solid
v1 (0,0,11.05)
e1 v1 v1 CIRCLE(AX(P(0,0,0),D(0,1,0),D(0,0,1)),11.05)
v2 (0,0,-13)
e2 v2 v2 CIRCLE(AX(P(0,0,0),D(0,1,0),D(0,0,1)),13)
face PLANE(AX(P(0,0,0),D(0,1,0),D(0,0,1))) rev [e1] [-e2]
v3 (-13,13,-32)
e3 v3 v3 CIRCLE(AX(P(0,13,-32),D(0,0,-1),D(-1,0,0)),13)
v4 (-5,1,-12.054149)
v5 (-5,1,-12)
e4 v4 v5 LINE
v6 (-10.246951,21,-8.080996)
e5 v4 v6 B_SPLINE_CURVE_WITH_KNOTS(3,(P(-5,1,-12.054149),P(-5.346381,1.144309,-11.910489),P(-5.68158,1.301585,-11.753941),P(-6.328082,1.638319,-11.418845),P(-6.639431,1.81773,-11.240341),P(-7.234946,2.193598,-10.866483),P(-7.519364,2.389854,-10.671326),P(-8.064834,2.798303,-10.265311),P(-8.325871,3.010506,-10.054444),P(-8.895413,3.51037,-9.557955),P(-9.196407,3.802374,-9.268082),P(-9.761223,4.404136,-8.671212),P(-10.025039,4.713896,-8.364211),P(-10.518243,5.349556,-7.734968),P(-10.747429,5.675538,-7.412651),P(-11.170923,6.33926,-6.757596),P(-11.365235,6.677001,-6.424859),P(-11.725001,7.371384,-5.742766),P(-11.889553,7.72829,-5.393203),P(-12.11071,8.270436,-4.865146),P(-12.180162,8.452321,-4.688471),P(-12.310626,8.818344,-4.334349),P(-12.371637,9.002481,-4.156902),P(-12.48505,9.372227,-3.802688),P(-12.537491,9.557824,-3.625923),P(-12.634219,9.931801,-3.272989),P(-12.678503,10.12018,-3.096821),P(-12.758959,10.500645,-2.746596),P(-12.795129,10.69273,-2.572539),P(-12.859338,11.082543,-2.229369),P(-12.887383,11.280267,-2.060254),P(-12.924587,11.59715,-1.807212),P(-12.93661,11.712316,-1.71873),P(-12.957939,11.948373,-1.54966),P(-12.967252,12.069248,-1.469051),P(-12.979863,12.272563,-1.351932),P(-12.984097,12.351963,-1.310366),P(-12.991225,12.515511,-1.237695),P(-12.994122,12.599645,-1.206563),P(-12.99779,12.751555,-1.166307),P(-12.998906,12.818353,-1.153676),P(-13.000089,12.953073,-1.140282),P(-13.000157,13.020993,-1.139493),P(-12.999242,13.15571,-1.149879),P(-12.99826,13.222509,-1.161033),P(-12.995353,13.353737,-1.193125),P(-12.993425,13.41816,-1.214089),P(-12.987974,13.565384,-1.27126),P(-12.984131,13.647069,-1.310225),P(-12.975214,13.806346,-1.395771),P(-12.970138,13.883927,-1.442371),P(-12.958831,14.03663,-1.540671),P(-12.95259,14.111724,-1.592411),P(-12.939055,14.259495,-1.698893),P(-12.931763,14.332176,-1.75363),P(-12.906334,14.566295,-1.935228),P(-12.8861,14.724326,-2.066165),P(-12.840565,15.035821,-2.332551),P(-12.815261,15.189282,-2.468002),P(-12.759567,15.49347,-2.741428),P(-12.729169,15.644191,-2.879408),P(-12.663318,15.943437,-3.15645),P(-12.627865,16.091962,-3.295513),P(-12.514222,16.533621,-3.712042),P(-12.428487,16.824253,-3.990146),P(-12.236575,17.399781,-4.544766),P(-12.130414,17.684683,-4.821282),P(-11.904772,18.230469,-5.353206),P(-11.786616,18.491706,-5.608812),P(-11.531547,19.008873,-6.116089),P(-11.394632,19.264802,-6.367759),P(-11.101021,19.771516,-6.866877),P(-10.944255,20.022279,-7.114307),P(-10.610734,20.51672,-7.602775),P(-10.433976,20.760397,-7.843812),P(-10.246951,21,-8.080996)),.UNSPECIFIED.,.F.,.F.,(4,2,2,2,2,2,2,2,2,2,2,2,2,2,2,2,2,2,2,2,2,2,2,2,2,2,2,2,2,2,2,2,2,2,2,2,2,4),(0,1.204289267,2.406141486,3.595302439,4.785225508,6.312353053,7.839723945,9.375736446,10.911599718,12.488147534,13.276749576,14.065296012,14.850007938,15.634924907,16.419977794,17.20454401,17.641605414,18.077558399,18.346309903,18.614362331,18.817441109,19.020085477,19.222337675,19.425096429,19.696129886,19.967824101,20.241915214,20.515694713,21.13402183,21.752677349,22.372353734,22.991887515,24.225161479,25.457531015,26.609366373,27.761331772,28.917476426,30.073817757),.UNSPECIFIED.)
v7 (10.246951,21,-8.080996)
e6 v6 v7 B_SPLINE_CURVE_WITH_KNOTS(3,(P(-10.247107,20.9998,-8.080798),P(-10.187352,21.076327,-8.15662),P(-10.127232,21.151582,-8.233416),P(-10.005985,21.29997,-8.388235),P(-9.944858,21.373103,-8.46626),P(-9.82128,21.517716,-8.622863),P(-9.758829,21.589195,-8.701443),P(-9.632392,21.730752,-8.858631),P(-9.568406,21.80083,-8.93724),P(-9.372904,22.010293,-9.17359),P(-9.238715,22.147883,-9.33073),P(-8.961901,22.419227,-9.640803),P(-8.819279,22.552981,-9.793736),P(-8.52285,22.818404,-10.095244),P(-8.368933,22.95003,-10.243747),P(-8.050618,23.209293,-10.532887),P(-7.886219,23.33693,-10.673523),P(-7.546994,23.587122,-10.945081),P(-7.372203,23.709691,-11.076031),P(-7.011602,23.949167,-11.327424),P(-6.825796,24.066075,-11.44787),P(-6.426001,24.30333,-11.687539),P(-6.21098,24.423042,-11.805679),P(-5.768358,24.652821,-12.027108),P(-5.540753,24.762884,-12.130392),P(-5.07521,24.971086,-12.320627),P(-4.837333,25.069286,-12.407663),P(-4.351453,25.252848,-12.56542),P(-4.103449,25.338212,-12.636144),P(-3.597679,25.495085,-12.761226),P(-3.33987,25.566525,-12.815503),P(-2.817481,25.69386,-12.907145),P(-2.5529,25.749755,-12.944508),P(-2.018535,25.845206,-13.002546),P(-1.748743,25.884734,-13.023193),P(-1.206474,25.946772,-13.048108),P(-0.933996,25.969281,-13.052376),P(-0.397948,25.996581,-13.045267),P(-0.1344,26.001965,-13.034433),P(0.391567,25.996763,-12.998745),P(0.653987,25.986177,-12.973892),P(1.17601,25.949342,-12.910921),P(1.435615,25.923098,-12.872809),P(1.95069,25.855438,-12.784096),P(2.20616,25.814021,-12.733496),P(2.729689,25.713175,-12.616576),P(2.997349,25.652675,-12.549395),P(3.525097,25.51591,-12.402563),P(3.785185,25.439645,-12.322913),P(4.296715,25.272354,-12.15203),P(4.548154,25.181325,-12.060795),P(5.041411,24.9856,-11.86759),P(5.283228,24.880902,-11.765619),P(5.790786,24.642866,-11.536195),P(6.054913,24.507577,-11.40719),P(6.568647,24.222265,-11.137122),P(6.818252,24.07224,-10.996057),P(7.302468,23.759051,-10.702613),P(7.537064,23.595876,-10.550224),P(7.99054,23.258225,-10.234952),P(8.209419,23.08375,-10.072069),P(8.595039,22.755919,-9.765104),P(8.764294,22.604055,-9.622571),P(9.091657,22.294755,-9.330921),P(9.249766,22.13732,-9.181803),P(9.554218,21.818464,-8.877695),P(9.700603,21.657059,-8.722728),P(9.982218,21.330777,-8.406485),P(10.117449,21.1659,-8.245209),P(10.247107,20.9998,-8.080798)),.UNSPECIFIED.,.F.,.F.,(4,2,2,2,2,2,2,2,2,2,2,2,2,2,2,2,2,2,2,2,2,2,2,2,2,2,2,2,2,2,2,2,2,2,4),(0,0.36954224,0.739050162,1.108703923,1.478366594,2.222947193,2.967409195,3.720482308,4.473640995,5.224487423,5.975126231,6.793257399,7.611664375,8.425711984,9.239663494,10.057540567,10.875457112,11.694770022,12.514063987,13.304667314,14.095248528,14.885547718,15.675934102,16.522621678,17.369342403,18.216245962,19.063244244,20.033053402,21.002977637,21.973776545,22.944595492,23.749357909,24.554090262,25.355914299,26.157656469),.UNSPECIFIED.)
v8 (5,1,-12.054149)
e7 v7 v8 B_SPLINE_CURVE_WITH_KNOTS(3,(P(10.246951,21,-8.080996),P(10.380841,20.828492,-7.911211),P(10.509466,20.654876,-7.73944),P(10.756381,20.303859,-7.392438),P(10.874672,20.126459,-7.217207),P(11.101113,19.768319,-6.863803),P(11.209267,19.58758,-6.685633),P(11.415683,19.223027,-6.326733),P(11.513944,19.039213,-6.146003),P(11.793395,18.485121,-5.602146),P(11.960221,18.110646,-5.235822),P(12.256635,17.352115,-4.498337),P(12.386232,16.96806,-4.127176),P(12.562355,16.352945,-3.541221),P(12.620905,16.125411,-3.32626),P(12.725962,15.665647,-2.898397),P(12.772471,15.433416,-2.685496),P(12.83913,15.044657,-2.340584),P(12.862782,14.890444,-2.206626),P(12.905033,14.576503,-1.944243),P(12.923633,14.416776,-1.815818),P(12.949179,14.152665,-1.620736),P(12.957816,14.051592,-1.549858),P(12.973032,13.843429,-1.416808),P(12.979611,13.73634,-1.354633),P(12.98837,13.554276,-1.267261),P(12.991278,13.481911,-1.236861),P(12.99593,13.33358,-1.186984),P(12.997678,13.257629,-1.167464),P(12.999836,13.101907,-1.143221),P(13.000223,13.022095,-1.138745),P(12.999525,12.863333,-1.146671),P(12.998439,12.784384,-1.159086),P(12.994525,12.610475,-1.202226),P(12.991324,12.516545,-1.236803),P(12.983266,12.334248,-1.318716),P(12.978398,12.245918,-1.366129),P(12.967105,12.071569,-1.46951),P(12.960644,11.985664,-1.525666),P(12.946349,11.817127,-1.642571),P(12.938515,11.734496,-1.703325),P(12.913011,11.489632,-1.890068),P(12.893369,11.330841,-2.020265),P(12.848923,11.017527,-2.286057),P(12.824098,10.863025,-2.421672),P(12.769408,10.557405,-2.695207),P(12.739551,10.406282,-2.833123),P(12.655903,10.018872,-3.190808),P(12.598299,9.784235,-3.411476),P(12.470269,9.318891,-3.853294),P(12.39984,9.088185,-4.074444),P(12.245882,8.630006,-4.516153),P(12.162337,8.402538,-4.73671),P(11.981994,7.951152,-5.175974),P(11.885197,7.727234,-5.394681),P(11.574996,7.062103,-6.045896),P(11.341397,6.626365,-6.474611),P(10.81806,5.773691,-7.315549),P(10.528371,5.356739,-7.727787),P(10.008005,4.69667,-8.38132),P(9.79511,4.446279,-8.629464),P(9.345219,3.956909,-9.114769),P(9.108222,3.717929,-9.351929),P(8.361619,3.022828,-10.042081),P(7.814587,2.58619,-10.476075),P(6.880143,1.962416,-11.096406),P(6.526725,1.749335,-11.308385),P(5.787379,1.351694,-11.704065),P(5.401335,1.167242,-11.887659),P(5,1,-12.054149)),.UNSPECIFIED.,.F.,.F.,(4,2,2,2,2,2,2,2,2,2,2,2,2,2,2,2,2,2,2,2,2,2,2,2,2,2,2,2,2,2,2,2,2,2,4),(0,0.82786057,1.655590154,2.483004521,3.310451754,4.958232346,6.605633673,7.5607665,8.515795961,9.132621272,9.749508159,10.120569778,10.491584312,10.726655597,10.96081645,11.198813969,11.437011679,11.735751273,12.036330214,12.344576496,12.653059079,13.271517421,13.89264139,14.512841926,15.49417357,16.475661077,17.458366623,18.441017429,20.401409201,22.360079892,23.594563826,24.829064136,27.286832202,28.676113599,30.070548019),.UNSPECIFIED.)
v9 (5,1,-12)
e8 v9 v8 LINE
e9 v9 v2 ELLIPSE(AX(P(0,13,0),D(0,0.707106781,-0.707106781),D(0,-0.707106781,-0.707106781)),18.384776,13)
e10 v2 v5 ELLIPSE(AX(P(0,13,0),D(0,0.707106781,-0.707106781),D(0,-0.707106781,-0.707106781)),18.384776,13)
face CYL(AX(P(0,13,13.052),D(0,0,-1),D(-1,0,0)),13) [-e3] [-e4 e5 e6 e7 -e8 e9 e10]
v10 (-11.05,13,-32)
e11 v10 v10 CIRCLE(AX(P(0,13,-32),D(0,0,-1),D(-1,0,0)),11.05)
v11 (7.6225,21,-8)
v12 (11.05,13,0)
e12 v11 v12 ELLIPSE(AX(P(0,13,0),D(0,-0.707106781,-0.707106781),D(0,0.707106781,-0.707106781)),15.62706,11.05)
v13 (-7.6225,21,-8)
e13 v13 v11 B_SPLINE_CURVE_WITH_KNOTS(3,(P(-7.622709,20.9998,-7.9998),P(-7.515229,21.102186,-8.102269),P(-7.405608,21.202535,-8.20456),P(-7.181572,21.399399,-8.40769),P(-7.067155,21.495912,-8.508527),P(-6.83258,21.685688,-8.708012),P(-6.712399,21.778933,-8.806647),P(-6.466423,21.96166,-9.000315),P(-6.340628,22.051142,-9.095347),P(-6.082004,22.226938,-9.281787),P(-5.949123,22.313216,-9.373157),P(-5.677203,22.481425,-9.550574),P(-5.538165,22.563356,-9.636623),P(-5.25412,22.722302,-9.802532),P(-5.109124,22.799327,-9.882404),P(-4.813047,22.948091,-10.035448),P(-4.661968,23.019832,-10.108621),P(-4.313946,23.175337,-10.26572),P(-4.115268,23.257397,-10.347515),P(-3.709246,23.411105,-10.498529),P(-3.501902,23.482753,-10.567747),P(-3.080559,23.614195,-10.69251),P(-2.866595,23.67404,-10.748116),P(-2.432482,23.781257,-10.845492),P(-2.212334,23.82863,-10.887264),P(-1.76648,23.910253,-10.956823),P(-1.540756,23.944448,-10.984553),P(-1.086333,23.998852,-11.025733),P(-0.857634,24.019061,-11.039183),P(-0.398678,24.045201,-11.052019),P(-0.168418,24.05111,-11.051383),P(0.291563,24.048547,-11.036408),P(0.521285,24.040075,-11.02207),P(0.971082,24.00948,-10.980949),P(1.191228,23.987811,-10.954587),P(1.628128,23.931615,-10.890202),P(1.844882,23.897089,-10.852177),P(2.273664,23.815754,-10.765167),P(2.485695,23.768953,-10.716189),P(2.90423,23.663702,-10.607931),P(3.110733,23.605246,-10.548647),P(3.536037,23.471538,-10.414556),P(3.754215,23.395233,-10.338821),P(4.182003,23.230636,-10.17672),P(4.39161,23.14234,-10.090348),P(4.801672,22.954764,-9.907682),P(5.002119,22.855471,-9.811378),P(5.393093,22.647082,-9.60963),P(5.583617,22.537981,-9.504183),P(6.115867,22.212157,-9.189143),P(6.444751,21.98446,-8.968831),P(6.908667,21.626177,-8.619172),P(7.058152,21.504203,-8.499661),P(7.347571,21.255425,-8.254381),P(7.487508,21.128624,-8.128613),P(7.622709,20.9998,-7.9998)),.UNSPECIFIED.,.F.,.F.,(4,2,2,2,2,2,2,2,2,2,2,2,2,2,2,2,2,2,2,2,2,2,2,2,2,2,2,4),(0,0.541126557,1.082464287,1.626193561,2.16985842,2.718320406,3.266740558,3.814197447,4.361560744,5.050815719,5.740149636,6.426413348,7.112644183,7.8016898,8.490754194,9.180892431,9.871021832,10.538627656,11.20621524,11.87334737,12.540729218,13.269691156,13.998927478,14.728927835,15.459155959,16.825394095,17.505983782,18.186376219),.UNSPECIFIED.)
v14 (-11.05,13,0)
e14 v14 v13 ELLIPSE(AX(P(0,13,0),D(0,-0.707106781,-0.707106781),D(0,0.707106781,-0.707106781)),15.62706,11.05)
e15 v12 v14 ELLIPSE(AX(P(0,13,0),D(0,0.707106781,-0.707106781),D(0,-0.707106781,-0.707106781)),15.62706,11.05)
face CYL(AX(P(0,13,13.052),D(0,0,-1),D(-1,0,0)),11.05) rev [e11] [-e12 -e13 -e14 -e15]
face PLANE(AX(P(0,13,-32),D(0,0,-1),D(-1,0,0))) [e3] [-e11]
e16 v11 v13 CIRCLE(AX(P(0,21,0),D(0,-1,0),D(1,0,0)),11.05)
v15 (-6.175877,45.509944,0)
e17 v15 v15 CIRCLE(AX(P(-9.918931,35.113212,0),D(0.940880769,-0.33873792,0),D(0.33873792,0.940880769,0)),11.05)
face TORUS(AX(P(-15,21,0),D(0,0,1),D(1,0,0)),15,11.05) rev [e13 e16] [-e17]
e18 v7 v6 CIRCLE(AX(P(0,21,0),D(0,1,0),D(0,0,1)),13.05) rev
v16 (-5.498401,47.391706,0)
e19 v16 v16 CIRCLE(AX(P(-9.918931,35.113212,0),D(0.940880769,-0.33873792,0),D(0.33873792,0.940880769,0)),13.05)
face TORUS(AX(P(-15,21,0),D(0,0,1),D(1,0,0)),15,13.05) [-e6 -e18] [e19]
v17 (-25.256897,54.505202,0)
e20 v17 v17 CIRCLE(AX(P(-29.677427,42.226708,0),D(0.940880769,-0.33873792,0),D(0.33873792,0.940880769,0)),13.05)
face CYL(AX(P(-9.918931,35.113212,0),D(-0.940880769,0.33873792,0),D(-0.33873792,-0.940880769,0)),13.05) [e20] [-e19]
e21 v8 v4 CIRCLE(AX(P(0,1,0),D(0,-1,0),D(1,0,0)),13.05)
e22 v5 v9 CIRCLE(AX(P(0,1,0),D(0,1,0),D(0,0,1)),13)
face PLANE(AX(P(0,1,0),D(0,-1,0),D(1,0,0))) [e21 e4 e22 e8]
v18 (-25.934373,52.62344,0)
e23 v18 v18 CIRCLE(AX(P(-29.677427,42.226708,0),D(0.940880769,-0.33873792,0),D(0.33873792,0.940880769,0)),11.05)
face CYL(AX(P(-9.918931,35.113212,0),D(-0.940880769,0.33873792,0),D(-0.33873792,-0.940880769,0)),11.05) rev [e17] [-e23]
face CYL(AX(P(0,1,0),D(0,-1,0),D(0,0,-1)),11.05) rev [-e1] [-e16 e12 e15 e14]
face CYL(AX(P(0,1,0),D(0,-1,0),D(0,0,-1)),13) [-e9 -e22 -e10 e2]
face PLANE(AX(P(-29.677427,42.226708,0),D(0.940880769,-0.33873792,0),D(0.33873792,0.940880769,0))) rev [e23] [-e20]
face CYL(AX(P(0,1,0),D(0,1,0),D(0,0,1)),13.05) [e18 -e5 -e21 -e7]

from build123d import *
from build123d.topology import SkipClean

# Parameters (mm, degrees)
CROQUIS1_R                          = 13
CROQUIS1_R_2                        = 11.05
SALIENTE_EXTRUIR1_DEPTH             = 1
BARRER_L_MINA1_PROFILE_R            = 13.05
BARRER_L_MINA1_PROFILE_R_2          = 11.05
CROQUIS19_R                         = 13
CROQUIS19_R_2                       = 11.05
SALIENTE_EXTRUIR2_DEPTH             = 14
SALIENTE_EXTRUIR2_DIRECTION_2_REACH = 73.397
CORTAR_EXTRUIR1_START               = -32.0000001
CORTAR_EXTRUIR1_OUTLINE_R           = 11.05
CORTAR_EXTRUIR1_DEPTH               = 32.0000001


with BuildPart() as part:
    # Croquis1 → Saliente-Extruir1 (new body)
    with BuildSketch(Plane(origin=(0, 0, 0), x_dir=(1, 0, 0), z_dir=(0, 1, 0))):
        with Locations(Location((0, 0, 0), (0, 0, 270))):
            Circle(CROQUIS1_R)
        with Locations(Location((0, 0, 0), (0, 0, 270))):
            Circle(CROQUIS1_R_2, mode=Mode.SUBTRACT)
    extrude(amount=SALIENTE_EXTRUIR1_DEPTH)

    # Barrer-Lámina1: sweep along a path in Croquis2
    with BuildLine(Plane.XY) as barrer_l_mina1_path:
        Line((0, 1), (0, 21))
        ThreePointArc((0, 21), (-2.727754239, 29.625078781), (-9.918931196, 35.113211534))
        Line((-9.918931196, 35.113211534), (-29.677427344, 42.226707859))
    # Barrer-Lámina1 profile (on start of the path) → Barrer-Lámina1 (sweep)
    with BuildSketch(Plane.ZX.offset(1)):
        Circle(BARRER_L_MINA1_PROFILE_R)
        Circle(BARRER_L_MINA1_PROFILE_R_2, mode=Mode.SUBTRACT)
    sweep(path=barrer_l_mina1_path.line)

    # Croquis19 → Saliente-Extruir2 (add)
    with BuildSketch(Plane(origin=(0, 0, -18), x_dir=(-1, 0, 0), z_dir=(0, 0, -1))):
        with Locations((0, 13)):
            Circle(CROQUIS19_R)
        with Locations((0, 13)):
            Circle(CROQUIS19_R_2, mode=Mode.SUBTRACT)
    extrude(amount=SALIENTE_EXTRUIR2_DEPTH)

    # Croquis19 → Saliente-Extruir2 direction 2 (add, up to next)
    with BuildSketch(Plane(origin=(0, 0, -18), x_dir=(-1, 0, 0), z_dir=(0, 0, -1)), mode=Mode.PRIVATE) as saliente_extruir2_direction_2_sk1:
        with Locations((0, 13)):
            Circle(CROQUIS19_R)
        with Locations((0, 13)):
            Circle(CROQUIS19_R_2, mode=Mode.SUBTRACT)
    saliente_extruir2_direction_2_tool1 = extrude(saliente_extruir2_direction_2_sk1.sketch, amount=-SALIENTE_EXTRUIR2_DIRECTION_2_REACH, mode=Mode.PRIVATE) - part.part
    add(saliente_extruir2_direction_2_tool1.solids().sort_by_distance((12.632304, 13, -18))[0])

    # Cortar-Extruir1: read off the stored shape, not the designer's step
    # Cortar-Extruir1 outline → Cortar-Extruir1 (cut)
    with SkipClean():  # the faces are left unmerged after this step: merging them gives an invalid solid
        with BuildSketch(Plane(origin=(0, 0, -32), x_dir=(-1, 0, 0), z_dir=(0, 0, -1)).offset(CORTAR_EXTRUIR1_START)):
            with Locations((0, 13)):
                Circle(CORTAR_EXTRUIR1_OUTLINE_R)
        extrude(amount=CORTAR_EXTRUIR1_DEPTH, mode=Mode.SUBTRACT)


solid = part.part
